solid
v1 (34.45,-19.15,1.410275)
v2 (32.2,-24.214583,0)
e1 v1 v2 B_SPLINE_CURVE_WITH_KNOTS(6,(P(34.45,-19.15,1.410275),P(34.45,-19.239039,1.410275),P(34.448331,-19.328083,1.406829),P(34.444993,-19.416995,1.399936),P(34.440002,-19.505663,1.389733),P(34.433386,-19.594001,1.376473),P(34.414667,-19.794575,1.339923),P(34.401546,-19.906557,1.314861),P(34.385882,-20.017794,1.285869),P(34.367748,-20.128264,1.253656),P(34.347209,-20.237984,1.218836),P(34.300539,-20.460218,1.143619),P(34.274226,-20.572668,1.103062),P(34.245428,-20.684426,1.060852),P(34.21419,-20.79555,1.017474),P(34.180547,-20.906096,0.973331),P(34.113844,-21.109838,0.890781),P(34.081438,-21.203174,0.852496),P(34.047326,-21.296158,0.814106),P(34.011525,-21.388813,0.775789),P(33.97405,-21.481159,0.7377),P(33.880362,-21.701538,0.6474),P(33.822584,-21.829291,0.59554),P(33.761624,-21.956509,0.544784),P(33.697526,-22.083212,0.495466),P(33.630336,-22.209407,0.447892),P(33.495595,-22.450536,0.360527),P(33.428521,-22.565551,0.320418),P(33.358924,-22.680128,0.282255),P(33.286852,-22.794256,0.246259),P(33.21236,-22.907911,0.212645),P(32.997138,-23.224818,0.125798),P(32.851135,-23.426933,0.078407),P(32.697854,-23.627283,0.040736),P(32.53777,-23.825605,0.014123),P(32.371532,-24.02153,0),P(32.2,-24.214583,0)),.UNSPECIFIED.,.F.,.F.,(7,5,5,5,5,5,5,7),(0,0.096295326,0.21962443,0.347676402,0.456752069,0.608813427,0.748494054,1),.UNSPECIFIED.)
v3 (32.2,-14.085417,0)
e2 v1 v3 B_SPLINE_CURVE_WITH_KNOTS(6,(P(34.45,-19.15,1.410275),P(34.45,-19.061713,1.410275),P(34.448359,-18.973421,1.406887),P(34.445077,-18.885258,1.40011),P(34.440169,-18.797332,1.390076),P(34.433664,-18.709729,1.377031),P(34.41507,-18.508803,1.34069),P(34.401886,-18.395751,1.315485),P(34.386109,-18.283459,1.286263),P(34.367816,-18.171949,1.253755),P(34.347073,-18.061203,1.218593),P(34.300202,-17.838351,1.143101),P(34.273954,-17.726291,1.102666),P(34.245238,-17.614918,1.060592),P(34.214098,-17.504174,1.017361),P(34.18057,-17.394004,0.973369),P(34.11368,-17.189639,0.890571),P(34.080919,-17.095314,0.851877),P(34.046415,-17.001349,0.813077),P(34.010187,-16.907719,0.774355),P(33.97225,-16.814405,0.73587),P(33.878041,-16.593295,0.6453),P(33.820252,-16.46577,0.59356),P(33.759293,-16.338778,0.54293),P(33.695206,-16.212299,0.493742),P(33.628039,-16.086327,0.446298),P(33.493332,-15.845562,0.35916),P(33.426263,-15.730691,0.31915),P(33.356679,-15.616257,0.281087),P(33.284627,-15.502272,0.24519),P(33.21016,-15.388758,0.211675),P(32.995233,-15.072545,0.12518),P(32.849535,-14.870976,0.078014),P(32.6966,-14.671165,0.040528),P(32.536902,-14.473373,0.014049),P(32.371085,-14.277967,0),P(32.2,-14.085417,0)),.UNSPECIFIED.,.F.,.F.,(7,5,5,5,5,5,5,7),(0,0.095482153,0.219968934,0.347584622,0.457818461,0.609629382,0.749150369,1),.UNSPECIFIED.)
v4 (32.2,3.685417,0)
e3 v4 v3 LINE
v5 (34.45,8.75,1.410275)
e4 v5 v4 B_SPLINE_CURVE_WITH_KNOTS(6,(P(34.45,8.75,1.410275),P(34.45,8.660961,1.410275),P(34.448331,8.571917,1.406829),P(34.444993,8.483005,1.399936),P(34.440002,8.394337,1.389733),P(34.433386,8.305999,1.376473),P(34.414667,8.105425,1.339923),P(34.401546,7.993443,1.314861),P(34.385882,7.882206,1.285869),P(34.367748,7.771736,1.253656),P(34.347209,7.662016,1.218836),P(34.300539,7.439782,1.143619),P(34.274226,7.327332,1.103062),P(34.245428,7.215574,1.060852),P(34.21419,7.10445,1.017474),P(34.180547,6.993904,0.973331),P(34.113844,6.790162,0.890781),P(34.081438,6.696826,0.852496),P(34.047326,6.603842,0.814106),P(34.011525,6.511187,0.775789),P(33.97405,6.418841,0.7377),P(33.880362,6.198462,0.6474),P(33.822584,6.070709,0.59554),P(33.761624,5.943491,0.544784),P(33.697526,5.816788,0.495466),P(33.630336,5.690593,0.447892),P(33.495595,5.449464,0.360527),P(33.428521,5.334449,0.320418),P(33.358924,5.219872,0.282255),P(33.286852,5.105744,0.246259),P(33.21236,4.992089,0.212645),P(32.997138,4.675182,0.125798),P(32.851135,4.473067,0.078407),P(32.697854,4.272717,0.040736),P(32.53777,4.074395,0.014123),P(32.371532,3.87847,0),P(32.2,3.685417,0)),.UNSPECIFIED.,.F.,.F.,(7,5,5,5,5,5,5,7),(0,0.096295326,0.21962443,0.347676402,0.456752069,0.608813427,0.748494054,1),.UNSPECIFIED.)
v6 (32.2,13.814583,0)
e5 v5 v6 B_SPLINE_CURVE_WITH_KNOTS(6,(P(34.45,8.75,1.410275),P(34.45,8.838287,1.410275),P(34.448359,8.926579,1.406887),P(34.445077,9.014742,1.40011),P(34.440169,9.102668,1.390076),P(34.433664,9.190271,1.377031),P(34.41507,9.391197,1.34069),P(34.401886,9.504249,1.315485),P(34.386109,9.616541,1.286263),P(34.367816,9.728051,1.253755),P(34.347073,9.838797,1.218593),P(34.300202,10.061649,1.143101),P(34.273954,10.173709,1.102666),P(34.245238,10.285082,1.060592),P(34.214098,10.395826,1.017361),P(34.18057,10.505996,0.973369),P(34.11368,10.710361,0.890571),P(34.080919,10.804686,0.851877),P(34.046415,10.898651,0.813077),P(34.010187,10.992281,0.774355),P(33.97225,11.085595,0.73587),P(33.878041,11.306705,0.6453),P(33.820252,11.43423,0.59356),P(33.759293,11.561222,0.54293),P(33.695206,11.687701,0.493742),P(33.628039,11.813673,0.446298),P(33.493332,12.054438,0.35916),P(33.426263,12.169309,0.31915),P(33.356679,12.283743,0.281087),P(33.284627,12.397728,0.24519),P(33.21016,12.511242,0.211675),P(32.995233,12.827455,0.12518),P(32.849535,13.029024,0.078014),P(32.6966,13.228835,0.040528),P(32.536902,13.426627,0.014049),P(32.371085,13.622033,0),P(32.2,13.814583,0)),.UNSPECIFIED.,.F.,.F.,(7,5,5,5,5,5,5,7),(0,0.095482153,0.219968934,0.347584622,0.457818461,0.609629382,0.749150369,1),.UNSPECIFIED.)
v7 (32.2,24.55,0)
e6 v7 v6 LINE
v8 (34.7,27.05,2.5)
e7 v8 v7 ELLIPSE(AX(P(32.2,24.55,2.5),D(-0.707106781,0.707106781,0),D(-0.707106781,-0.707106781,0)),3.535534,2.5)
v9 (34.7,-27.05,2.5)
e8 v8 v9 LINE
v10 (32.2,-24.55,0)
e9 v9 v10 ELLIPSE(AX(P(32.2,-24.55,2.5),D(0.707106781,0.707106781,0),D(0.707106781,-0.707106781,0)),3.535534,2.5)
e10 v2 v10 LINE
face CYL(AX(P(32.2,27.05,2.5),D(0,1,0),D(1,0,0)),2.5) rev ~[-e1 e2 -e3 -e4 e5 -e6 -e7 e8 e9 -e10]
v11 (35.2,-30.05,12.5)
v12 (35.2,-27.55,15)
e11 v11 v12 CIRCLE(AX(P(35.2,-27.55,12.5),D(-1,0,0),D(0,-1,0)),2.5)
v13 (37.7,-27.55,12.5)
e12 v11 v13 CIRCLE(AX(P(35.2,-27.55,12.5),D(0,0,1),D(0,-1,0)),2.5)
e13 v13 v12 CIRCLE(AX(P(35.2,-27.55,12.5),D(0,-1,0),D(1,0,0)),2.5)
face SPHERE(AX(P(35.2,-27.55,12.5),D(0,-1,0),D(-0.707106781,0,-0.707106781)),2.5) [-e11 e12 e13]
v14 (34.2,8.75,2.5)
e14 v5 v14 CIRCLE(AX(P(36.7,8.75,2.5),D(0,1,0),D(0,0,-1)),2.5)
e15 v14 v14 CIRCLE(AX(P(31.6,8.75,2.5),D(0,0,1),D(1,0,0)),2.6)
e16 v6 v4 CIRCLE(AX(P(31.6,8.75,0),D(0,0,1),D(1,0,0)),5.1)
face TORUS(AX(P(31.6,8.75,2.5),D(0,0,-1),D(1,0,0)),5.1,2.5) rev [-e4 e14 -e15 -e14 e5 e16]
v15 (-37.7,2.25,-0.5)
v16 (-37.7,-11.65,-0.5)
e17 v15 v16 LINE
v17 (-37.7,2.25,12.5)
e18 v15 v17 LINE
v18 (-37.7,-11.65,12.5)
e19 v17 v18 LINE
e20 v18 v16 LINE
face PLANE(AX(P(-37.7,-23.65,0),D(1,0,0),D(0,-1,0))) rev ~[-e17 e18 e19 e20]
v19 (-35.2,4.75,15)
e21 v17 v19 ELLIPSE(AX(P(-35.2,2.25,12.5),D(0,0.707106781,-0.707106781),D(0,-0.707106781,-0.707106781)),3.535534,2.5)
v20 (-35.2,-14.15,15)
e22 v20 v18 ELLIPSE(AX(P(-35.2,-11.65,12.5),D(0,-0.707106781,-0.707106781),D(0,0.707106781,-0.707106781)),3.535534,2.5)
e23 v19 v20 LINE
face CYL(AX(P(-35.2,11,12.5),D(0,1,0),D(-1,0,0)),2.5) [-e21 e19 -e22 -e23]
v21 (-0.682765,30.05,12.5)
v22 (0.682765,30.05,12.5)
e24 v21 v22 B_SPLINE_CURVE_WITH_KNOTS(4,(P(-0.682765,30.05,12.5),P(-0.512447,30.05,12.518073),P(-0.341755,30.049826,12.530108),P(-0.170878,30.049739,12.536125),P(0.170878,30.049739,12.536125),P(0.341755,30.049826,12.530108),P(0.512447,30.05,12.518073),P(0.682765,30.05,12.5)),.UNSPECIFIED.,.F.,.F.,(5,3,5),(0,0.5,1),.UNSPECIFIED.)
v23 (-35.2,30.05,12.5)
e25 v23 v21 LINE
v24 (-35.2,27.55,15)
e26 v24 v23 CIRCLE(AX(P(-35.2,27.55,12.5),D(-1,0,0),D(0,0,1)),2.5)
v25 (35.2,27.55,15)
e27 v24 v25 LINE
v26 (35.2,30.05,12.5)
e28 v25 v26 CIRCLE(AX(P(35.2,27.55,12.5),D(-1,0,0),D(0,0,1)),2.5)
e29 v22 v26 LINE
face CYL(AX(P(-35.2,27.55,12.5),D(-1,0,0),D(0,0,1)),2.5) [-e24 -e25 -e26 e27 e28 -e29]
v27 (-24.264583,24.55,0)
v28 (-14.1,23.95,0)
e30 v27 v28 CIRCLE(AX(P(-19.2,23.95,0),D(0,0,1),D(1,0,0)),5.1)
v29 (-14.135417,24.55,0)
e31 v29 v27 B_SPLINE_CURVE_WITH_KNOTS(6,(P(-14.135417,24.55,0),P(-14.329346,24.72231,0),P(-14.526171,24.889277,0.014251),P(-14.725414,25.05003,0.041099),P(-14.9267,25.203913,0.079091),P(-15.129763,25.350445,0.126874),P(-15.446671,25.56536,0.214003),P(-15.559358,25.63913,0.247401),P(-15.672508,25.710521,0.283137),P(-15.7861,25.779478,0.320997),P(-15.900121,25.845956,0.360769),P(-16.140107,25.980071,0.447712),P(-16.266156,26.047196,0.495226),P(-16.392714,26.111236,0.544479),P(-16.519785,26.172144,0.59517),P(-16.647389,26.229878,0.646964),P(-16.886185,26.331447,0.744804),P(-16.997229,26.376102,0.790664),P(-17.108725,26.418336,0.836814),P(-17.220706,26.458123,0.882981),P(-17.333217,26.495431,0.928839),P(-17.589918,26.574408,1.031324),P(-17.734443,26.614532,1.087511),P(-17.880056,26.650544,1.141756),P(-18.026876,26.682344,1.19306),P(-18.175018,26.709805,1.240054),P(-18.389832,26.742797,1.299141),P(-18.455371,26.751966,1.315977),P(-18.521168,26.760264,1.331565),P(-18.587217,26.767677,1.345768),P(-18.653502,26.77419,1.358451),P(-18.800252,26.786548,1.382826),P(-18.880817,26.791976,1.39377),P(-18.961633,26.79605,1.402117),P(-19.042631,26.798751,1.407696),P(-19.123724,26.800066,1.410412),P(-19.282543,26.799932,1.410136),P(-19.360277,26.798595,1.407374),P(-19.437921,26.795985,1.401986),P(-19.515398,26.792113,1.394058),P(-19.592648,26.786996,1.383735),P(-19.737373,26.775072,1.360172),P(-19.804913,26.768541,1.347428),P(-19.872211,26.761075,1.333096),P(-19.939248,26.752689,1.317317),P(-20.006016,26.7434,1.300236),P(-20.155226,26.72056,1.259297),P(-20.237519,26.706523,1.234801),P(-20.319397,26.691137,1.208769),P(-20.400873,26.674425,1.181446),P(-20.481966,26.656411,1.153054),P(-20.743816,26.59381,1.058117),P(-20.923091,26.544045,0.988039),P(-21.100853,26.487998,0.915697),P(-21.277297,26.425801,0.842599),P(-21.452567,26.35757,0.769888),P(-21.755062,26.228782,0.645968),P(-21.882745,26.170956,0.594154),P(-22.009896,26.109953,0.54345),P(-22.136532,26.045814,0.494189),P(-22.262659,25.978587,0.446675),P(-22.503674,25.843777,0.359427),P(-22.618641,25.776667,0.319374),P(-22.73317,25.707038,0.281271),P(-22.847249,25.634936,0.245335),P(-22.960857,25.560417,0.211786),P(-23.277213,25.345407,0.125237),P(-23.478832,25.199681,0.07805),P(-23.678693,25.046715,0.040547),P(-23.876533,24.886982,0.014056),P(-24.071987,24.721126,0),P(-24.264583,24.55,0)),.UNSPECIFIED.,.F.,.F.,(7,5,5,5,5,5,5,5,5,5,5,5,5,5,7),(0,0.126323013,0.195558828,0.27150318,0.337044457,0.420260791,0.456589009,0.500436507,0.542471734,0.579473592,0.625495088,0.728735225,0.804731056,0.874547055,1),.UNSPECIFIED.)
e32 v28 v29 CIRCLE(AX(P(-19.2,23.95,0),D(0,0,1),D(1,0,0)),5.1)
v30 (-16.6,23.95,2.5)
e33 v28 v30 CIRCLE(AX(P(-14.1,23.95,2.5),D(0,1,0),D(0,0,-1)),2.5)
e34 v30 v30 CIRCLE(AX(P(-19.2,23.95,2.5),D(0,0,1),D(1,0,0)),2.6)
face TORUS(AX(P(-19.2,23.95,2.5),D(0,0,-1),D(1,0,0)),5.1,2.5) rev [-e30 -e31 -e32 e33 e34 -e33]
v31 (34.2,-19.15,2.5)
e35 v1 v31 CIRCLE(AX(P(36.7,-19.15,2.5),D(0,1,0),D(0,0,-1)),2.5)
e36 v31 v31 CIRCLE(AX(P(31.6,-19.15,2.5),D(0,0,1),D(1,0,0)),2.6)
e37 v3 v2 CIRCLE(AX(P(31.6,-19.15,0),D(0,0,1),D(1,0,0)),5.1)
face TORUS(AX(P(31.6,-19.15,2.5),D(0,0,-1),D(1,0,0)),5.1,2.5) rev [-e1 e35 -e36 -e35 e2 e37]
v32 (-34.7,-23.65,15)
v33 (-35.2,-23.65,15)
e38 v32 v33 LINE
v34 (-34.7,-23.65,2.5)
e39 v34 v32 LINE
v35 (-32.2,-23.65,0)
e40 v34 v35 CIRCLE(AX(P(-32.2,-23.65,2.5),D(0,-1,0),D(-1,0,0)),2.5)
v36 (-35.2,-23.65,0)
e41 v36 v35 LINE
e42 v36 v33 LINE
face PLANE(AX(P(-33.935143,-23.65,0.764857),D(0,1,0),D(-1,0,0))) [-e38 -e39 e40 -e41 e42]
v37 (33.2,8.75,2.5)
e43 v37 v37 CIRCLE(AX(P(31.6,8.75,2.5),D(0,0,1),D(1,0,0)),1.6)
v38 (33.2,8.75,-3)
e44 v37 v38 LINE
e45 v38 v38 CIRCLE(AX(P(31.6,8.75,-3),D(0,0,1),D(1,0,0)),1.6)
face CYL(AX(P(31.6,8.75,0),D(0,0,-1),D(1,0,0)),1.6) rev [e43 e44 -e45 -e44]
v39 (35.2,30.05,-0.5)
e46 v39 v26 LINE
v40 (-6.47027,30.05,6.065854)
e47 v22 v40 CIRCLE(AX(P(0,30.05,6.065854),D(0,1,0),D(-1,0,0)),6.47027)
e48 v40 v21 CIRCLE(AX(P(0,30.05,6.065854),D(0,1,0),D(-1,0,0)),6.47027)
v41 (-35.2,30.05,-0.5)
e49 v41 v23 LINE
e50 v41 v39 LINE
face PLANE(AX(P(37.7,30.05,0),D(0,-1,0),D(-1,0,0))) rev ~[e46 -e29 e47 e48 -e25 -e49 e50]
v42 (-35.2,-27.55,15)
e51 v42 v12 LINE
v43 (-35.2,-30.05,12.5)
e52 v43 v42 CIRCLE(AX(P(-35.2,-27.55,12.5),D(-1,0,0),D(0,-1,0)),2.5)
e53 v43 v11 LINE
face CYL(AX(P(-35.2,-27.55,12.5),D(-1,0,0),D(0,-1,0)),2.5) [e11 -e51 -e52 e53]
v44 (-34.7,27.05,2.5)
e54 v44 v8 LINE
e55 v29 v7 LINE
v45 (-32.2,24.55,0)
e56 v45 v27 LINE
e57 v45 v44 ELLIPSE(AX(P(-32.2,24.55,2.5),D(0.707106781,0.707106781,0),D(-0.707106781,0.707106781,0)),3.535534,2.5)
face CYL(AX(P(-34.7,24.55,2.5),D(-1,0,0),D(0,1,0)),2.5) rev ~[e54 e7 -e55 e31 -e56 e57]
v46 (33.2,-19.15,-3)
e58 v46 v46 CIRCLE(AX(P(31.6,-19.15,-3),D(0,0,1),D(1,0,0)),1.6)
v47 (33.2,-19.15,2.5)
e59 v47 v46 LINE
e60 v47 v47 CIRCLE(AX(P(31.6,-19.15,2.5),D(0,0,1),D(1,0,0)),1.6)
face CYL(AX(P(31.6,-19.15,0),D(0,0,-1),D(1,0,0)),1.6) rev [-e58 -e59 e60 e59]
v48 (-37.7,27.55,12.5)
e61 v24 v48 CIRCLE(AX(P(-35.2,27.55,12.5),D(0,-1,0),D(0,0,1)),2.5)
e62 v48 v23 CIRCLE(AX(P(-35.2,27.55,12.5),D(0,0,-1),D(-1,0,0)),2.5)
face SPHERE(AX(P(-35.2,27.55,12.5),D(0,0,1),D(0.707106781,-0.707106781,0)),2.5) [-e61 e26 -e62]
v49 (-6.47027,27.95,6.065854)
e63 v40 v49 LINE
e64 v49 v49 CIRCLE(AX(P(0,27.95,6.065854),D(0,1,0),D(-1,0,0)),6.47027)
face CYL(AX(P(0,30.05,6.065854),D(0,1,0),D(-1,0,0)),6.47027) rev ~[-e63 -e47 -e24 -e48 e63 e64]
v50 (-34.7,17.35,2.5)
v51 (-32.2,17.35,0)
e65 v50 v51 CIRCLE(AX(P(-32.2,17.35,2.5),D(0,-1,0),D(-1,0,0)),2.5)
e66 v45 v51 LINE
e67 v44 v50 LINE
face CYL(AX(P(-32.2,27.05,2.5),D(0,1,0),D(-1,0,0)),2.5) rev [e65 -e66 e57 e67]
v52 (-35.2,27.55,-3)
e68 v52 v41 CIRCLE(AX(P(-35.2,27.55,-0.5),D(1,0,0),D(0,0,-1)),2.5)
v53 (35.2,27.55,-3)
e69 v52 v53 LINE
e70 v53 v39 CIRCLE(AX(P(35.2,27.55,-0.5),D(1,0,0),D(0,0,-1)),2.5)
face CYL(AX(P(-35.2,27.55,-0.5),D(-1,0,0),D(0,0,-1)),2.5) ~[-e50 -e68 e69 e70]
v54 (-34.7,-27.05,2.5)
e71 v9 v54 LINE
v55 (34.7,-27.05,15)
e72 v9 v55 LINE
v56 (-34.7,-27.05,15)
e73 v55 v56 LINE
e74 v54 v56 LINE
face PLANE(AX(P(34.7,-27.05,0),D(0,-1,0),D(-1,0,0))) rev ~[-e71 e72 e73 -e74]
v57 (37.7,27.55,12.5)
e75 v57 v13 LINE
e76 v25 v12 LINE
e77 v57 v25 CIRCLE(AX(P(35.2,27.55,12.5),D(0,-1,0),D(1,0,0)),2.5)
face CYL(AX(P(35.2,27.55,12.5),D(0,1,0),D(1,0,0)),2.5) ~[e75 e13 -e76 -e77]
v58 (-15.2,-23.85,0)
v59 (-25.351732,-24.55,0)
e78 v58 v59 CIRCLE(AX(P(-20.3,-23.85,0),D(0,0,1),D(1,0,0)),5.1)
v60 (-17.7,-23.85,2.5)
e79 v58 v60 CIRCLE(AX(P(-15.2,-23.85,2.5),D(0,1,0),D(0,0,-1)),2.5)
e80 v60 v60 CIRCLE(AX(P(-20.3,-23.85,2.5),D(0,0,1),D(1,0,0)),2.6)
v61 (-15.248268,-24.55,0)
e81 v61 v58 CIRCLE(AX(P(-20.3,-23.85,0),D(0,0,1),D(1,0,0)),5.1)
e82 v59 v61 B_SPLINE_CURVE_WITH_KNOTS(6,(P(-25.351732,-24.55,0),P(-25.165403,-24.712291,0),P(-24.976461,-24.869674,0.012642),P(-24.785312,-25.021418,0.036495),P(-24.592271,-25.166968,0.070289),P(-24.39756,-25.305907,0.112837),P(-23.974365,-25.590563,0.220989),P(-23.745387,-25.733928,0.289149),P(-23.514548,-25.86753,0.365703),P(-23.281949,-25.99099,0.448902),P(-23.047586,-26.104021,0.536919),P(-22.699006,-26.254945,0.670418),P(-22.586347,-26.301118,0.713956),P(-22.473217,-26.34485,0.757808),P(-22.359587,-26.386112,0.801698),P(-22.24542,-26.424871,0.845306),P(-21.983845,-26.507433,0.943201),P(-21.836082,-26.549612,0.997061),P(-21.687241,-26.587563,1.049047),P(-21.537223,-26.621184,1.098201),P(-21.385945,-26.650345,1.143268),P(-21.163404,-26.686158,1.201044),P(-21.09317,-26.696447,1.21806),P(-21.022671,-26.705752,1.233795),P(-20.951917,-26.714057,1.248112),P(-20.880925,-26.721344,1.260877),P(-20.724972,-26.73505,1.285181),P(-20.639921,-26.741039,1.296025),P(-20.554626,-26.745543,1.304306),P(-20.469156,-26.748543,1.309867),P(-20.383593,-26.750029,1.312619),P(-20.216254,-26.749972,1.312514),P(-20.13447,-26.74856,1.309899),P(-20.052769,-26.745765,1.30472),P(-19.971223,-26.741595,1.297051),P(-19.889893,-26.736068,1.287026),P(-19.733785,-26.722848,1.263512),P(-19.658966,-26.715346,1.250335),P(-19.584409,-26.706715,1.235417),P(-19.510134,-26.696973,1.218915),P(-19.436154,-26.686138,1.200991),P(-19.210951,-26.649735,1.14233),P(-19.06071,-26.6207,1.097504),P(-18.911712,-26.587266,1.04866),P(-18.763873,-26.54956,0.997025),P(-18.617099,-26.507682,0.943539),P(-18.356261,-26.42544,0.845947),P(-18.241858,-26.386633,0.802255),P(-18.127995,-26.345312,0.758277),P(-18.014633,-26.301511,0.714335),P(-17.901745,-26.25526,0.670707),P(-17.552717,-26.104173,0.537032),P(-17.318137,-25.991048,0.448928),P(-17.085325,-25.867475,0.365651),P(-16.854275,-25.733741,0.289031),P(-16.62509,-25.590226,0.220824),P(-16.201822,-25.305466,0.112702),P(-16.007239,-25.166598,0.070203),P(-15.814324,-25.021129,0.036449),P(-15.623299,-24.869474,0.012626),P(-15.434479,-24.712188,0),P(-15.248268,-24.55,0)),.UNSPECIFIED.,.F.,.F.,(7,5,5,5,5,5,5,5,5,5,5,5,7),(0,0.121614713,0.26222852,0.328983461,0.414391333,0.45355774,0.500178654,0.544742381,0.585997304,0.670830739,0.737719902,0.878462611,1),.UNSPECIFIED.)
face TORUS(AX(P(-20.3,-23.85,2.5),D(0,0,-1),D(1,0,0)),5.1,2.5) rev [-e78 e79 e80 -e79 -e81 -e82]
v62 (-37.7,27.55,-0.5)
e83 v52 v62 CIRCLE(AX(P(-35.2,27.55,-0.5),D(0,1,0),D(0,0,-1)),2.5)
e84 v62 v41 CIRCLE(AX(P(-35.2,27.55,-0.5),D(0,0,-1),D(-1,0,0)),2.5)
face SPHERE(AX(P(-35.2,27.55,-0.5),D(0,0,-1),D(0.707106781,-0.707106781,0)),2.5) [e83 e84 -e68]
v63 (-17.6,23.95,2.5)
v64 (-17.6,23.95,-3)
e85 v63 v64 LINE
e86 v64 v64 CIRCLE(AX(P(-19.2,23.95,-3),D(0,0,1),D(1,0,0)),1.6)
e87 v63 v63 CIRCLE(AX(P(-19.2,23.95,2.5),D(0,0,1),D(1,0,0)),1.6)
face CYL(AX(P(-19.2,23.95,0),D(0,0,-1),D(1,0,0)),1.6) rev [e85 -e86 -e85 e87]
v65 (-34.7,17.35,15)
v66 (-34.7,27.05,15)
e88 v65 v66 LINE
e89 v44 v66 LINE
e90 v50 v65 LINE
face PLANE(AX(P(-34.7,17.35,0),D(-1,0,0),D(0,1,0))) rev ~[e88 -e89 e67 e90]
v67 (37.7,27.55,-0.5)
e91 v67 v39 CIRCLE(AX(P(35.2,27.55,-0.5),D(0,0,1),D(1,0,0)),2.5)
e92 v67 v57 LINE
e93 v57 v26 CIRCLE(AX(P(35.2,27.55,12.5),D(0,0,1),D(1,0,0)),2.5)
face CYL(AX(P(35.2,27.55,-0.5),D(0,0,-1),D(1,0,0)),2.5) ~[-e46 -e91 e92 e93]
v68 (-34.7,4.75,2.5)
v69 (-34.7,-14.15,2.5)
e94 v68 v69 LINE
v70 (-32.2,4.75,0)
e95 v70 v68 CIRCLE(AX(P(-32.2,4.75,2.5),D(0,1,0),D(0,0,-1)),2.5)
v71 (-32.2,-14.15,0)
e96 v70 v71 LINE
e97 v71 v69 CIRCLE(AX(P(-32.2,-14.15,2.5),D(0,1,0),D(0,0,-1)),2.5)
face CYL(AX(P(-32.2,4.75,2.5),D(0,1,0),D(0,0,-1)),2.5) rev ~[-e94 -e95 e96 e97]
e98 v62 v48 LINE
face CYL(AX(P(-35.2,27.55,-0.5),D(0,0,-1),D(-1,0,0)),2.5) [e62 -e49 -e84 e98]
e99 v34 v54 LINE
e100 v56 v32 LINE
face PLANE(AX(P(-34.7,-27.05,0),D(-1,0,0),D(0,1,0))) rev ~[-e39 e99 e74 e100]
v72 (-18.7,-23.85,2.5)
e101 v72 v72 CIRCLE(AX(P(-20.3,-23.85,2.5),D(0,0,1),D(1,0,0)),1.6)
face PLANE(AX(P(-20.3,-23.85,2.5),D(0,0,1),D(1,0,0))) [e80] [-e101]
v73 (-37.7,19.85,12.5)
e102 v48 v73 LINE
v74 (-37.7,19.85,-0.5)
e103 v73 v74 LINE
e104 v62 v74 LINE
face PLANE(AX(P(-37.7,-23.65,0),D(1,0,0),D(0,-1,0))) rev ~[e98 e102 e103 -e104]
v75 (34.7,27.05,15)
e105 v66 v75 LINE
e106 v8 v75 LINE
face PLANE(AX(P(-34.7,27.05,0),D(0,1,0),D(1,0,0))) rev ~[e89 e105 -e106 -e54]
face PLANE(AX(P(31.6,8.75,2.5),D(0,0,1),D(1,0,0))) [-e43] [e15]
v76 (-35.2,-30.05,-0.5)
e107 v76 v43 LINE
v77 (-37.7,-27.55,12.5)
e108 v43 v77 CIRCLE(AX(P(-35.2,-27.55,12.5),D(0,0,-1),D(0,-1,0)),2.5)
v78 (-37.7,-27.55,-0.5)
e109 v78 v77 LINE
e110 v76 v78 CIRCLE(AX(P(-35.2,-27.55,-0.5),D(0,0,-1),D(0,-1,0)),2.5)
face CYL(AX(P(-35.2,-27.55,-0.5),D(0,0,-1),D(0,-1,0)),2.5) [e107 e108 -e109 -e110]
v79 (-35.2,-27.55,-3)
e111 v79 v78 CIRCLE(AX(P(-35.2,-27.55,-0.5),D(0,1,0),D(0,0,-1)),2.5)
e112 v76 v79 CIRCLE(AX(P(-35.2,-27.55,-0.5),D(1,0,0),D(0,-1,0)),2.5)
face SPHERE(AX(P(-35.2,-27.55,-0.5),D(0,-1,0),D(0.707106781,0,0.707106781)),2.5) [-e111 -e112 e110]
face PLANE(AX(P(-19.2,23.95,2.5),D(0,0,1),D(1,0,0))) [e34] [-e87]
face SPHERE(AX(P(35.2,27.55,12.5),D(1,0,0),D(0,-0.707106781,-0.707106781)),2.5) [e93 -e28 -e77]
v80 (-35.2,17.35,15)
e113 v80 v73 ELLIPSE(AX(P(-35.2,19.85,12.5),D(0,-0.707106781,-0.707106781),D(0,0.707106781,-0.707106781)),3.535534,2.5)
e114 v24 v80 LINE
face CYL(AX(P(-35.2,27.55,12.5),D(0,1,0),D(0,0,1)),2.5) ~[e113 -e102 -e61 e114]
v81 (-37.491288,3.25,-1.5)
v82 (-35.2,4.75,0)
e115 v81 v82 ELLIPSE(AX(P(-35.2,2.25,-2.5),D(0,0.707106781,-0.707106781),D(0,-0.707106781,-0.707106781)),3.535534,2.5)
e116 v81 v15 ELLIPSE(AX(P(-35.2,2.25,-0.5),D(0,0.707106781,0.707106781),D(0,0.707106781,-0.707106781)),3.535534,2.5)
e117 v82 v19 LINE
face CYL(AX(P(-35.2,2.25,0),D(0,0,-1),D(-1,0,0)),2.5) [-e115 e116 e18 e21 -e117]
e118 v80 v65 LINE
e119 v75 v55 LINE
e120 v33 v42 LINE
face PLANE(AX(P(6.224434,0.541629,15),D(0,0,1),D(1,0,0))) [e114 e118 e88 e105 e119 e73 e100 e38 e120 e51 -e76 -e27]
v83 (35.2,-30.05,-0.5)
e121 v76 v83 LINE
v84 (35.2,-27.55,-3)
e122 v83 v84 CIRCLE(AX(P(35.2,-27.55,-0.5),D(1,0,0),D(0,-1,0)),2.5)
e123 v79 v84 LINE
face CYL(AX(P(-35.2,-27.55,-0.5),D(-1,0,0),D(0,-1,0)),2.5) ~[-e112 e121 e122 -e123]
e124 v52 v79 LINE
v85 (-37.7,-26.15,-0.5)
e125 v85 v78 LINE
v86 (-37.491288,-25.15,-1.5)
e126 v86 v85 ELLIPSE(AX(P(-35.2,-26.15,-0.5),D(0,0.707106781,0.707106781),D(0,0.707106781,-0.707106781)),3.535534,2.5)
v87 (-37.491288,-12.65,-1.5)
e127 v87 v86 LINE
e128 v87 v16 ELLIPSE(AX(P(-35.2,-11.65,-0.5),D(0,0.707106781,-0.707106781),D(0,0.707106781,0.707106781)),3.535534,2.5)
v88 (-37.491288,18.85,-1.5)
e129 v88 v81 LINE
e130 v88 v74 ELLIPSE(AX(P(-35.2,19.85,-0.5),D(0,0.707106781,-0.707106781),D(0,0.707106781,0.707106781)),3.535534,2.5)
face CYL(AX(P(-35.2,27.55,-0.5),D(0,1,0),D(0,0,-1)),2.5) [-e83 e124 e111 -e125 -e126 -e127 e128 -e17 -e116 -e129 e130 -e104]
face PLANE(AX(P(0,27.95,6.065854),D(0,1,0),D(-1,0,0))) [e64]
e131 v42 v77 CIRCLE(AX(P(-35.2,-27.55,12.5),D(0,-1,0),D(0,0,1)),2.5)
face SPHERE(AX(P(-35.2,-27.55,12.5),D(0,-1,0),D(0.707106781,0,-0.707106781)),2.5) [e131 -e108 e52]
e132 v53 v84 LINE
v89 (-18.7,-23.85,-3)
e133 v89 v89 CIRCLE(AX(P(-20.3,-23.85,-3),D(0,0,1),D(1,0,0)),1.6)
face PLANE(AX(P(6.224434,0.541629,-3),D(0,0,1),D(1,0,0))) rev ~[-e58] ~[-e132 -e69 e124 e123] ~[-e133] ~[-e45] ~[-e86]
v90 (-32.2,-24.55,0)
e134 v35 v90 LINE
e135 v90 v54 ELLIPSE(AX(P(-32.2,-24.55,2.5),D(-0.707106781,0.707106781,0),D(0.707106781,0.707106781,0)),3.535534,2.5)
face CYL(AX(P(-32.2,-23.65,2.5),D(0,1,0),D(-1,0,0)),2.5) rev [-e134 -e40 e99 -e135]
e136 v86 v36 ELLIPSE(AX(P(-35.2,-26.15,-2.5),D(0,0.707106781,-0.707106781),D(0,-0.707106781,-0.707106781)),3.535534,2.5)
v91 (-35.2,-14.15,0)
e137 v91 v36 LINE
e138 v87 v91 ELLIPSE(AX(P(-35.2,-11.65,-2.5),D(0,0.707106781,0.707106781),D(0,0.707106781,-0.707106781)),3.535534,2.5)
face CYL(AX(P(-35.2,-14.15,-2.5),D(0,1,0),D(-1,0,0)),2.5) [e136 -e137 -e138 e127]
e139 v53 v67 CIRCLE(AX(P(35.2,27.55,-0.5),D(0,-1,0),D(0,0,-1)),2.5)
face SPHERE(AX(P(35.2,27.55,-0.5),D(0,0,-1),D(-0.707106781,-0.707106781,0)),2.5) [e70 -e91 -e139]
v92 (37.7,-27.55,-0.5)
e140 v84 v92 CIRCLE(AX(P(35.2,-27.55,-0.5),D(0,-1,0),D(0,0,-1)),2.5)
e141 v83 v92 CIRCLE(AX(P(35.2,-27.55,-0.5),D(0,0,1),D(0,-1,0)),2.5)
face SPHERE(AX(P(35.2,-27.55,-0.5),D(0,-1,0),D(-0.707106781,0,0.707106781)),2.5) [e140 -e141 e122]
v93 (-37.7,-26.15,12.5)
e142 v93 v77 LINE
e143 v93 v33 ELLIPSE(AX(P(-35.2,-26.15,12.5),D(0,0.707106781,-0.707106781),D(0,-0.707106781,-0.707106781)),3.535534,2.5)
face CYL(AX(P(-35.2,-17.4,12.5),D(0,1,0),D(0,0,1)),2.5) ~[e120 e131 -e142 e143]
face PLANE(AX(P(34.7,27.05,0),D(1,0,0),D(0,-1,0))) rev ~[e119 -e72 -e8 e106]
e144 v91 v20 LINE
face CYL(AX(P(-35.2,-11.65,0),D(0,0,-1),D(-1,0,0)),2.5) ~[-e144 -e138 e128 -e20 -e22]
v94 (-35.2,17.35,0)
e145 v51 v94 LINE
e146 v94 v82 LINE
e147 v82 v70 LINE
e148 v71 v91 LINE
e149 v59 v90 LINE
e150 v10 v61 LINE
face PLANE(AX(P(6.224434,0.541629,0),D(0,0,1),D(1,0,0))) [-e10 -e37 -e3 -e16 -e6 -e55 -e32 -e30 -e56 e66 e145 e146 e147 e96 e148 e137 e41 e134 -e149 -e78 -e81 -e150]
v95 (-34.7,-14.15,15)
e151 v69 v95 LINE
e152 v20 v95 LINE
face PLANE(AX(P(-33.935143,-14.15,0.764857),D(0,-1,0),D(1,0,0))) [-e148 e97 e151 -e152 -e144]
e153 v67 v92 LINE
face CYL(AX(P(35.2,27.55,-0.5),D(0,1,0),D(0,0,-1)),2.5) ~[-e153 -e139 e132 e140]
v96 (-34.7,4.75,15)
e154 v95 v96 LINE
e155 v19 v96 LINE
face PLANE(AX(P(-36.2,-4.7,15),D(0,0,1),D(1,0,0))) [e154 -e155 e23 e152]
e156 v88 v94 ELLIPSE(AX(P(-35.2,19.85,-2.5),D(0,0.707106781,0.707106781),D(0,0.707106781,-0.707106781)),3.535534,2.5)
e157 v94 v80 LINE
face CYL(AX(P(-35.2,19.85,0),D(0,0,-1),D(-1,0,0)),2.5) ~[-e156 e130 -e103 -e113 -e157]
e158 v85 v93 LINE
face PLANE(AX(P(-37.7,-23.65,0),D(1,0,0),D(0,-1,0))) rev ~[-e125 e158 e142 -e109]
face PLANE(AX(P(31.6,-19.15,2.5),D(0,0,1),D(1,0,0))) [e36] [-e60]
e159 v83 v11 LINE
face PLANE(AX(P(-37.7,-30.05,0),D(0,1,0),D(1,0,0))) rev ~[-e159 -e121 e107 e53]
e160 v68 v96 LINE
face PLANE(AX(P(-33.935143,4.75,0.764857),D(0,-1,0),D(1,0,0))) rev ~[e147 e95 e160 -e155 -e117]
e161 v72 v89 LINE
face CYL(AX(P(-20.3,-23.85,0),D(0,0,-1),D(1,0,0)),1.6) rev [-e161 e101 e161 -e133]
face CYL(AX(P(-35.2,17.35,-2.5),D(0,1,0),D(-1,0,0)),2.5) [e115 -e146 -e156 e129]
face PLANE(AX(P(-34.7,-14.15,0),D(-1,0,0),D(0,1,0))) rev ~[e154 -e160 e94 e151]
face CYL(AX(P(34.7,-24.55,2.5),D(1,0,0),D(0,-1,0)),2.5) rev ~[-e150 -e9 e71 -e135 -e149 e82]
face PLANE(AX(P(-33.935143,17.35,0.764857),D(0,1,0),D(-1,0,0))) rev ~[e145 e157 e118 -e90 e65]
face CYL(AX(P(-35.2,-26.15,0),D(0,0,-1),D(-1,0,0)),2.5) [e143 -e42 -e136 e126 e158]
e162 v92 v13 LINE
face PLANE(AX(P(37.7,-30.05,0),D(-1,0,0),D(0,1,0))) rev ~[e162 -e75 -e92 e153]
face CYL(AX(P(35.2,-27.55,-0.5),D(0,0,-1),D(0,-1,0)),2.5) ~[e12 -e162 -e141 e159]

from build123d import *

# Parameters (mm, degrees)
F0_W          = 0.4
F0_H          = 0.3
F0_H_2        = 8.9
F0_W_2        = 9.5
F0_R          = 2.6
F0_W_3        = 10.3
F0_H_3        = 12
F0_W_4        = 3
F0_R_2        = 1.6
F0_H_4        = 18.9
F1_DEPTH      = 3
F2_DEPTH      = 15
F3_DEPTH      = 2.5
F4_T1_DEPTH   = 9.7
F4_T3_DEPTH   = 18.9
F4_T5_DEPTH   = 3.4
F4_T10_DEPTH  = 69.4
F4_S11_R      = 2.6
F4_T12_DEPTH  = 36
F4_T16_DEPTH  = 69.4
F4_S17_R      = 2.6
F4_T18_DEPTH  = 36
F4_T22_DEPTH  = 54.1
F4_S23_R      = 2.6
F4_T24_DEPTH  = 29
F4_S25_R      = 2.6
F4_T26_DEPTH  = 29
F4_T35_DEPTH  = 13
F4_T37_DEPTH  = 21.25
F4_T39_DEPTH  = 12.6
F4_T41_DEPTH  = 9.5
F4_T43_DEPTH  = 55.1
F4_T45_DEPTH  = 70.4
F4_T47_DEPTH  = 31.4
F4_T49_DEPTH  = 16.45
F4_T51_DEPTH  = 10.15
F4_S55_W      = 2.55
F4_S55_H      = 2.55
F4_T56_DEPTH  = 2.55
F4_S61_W      = 2.55
F4_S61_H      = 2.55
F4_T62_DEPTH  = 2.55
F4_S67_W      = 2.55
F4_S67_H      = 2.55
F4_T68_DEPTH  = 2.55
F4_S73_W      = 2.55
F4_S73_H      = 2.55
F4_T74_DEPTH  = 2.55
F4_S79_W      = 2.55
F4_S79_H      = 2.55
F4_T80_DEPTH  = 2.55
F4_S85_W      = 2.55
F4_S85_H      = 2.55
F4_T86_DEPTH  = 2.55
F4_S91_W      = 2.55
F4_S91_H      = 2.55
F4_T92_DEPTH  = 2.55
F4_S97_W      = 2.55
F4_S97_H      = 2.55
F4_T98_DEPTH  = 2.55
F4_T105_DEPTH = 15.75
F4_T109_DEPTH = 21.25
F4_T117_DEPTH = 18.85
F4_T121_DEPTH = 21.25
F4_T129_DEPTH = 21.25
F4_T134_DEPTH = 18.85
F4_T141_DEPTH = 21.25
F4_T146_DEPTH = 15.75
F5_R          = 6.4702703145
F6_DEPTH      = 2.1


# Not quite as in the source:
# - a fillet or chamfer that OpenCascade refuses, or shapes differently, is made with other operations: its cross-section is extruded or revolved along the edge and cut away or added


with BuildPart() as f1:
    # F0 (on Top) → F1 (new body)
    with BuildSketch(Plane.XY):
        Polygon((-34.7, -27.05), (-34.7, -23.65), (-37.7, -23.65), (-37.7, -30.05), (37.7, -30.05), (37.7, 30.05), (-37.7, 30.05), (-37.7, 17.35), (-34.7, 17.35), (-34.7, 27.05), (34.7, 27.05), (34.7, -27.05), align=None)
        with Locations((-34.5, -14.3)):
            Rectangle(F0_W, F0_H)
        with Locations((-34.5, -18.9)):
            Rectangle(F0_W, F0_H_2)
        with Locations((-29.55, -18.9)):
            Rectangle(F0_W_2, F0_H_2)
        Polygon((-34.3, -26.65), (34.3, -26.65), (34.3, 26.65), (-34.3, 26.65), (-34.3, 17.35), (-23.7, 17.35), (-23.7, 4.75), (-34.3, 4.75), (-34.3, -14.15), (-24.5, -14.15), (-24.5, -23.65), (-34.3, -23.65), align=None)
        with Locations((-20.3, -23.85)):
            Circle(F0_R, mode=Mode.SUBTRACT)
        with Locations((31.6, -19.15)):
            Circle(F0_R, mode=Mode.SUBTRACT)
        with Locations((-19.2, 23.95)):
            Circle(F0_R, mode=Mode.SUBTRACT)
        with Locations((31.6, 8.75)):
            Circle(F0_R, mode=Mode.SUBTRACT)
        Polygon((34.3, 26.65), (34.3, -26.65), (-34.3, -26.65), (-34.3, -23.65), (-34.7, -23.65), (-34.7, -27.05), (34.7, -27.05), (34.7, 27.05), (-34.7, 27.05), (-34.7, 17.35), (-34.3, 17.35), (-34.3, 26.65), align=None)
        with Locations((-29.15, 11.05)):
            Rectangle(F0_W_3, F0_H_3)
        with Locations((-36.2, 11.05)):
            Rectangle(F0_W_4, F0_H_3)
        with Locations((-34.5, 11.05)):
            Rectangle(F0_W, F0_H_3)
        with Locations((-36.2, -18.9)):
            Rectangle(F0_W_4, F0_H_2)
        with Locations((-36.2, -14.3)):
            Rectangle(F0_W_4, F0_H)
        with Locations((-19.2, 23.95)):
            Circle(F0_R)
        with Locations((-19.2, 23.95)):
            Circle(F0_R_2, mode=Mode.SUBTRACT)
        with Locations((-20.3, -23.85)):
            Circle(F0_R)
        with Locations((-20.3, -23.85)):
            Circle(F0_R_2, mode=Mode.SUBTRACT)
        with Locations((31.6, -19.15)):
            Circle(F0_R)
        with Locations((31.6, -19.15)):
            Circle(F0_R_2, mode=Mode.SUBTRACT)
        with Locations((31.6, 8.75)):
            Circle(F0_R)
        with Locations((31.6, 8.75)):
            Circle(F0_R_2, mode=Mode.SUBTRACT)
        with Locations((-36.2, 4.9)):
            Rectangle(F0_W_4, F0_H)
        with Locations((-34.5, 4.9)):
            Rectangle(F0_W, F0_H)
        Polygon((-23.7, 17.35), (-34.3, 17.35), (-34.3, 17.05), (-24, 17.05), (-24, 5.05), (-34.3, 5.05), (-34.3, 4.75), (-23.7, 4.75), align=None)
        with Locations((-34.5, -4.7)):
            Rectangle(F0_W, F0_H_4)
        with Locations((-36.2, -4.7)):
            Rectangle(F0_W_4, F0_H_4)
        Polygon((-34.3, -23.35), (-34.3, -23.65), (-24.5, -23.65), (-24.5, -14.15), (-34.3, -14.15), (-34.3, -14.45), (-24.8, -14.45), (-24.8, -23.35), align=None)
        with Locations((-36.2, 17.2)):
            Rectangle(F0_W_4, F0_H)
        with Locations((-34.5, 17.2)):
            Rectangle(F0_W, F0_H)
        with Locations((-34.5, -23.5)):
            Rectangle(F0_W, F0_H)
        with Locations((-36.2, -23.5)):
            Rectangle(F0_W_4, F0_H)
    extrude(amount=-F1_DEPTH)

    # F0 (on Top) → F2 (join)
    with BuildSketch(Plane.XY):
        Polygon((-34.7, -27.05), (-34.7, -23.65), (-37.7, -23.65), (-37.7, -30.05), (37.7, -30.05), (37.7, 30.05), (-37.7, 30.05), (-37.7, 17.35), (-34.7, 17.35), (-34.7, 27.05), (34.7, 27.05), (34.7, -27.05), align=None)
        with Locations((-36.2, -4.7)):
            Rectangle(F0_W_4, F0_H_4)
    extrude(amount=F2_DEPTH)

    # F0 (on Top) → F3 (join)
    with BuildSketch(Plane.XY):
        with Locations((-20.3, -23.85)):
            Circle(F0_R)
        with Locations((-20.3, -23.85)):
            Circle(F0_R_2, mode=Mode.SUBTRACT)
        with Locations((-19.2, 23.95)):
            Circle(F0_R)
        with Locations((-19.2, 23.95)):
            Circle(F0_R_2, mode=Mode.SUBTRACT)
        with Locations((31.6, 8.75)):
            Circle(F0_R)
        with Locations((31.6, 8.75)):
            Circle(F0_R_2, mode=Mode.SUBTRACT)
        with Locations((31.6, -19.15)):
            Circle(F0_R)
        with Locations((31.6, -19.15)):
            Circle(F0_R_2, mode=Mode.SUBTRACT)
    extrude(amount=F3_DEPTH)

    # F4: fillet of radius 2.5 on 30 edges, made by hand

    # F4_s2 → F4_t1 (join)
    with BuildSketch(Plane.XZ.offset(-27.05)):
        with BuildLine():
            ThreePointArc((-34.7, 2.5), (-33.967766953, 0.732233047), (-32.2, 0))
            Line((-32.2, 0), (-34.7, 0))
            Line((-34.7, 0), (-34.7, 2.5))
        make_face()
    extrude(amount=F4_T1_DEPTH)

    # F4_s4 → F4_t3 (join)
    with BuildSketch(Plane.XZ.offset(-4.75)):
        with BuildLine():
            ThreePointArc((-32.2, 0), (-33.967766953, 0.732233047), (-34.7, 2.5))
            Line((-34.7, 2.5), (-34.7, 0))
            Line((-34.7, 0), (-32.2, 0))
        make_face()
    extrude(amount=F4_T3_DEPTH)

    # F4_s6 → F4_t5 (join)
    with BuildSketch(Plane.XZ.offset(23.65)):
        with BuildLine():
            ThreePointArc((-34.7, 2.5), (-33.967766953, 0.732233047), (-32.2, 0))
            Line((-32.2, 0), (-34.7, 0))
            Line((-34.7, 0), (-34.7, 2.5))
        make_face()
    extrude(amount=F4_T5_DEPTH)


with BuildPart() as f4_tool8:
    # F4_s9 → F4_t10 (new body)
    with BuildSketch(Plane.YZ.offset(-34.7)):
        with BuildLine():
            ThreePointArc((27.05, 2.5), (26.317766953, 0.732233047), (24.55, 0))
            Line((24.55, 0), (27.05, 0))
            Line((27.05, 0), (27.05, 2.5))
        make_face()
    extrude(amount=F4_T10_DEPTH)

    # F4_s11 → F4_t12 (cut, symmetric)
    with BuildSketch(Plane.XY.offset(1.2)):
        with Locations((-19.2, 23.95)):
            Circle(F4_S11_R)
    extrude(amount=F4_T12_DEPTH, both=True, mode=Mode.SUBTRACT)


with BuildPart() as f1_1:
    add(f1.part)

    # F4_t7: union F4_tool8
    add(f4_tool8.part)


with BuildPart() as f4_tool14:
    # F4_s15 → F4_t16 (new body)
    with BuildSketch(Plane.YZ.offset(34.7)):
        with BuildLine():
            ThreePointArc((-27.05, 2.5), (-26.317766953, 0.732233047), (-24.55, 0))
            Line((-24.55, 0), (-27.05, 0))
            Line((-27.05, 0), (-27.05, 2.5))
        make_face()
    extrude(amount=-F4_T16_DEPTH)

    # F4_s17 → F4_t18 (cut, symmetric)
    with BuildSketch(Plane.XY.offset(1.2)):
        with Locations((-20.3, -23.85)):
            Circle(F4_S17_R)
    extrude(amount=F4_T18_DEPTH, both=True, mode=Mode.SUBTRACT)


with BuildPart() as f1_2:
    add(f1_1.part)

    # F4_t13: union F4_tool14
    add(f4_tool14.part)


with BuildPart() as f4_tool20:
    # F4_s21 → F4_t22 (new body)
    with BuildSketch(Plane.XZ.offset(-27.05)):
        with BuildLine():
            ThreePointArc((34.7, 2.5), (33.967766953, 0.732233047), (32.2, 0))
            Line((32.2, 0), (34.7, 0))
            Line((34.7, 0), (34.7, 2.5))
        make_face()
    extrude(amount=F4_T22_DEPTH)

    # F4_s23 → F4_t24 (cut, symmetric)
    with BuildSketch(Plane.XY.offset(1.2)):
        with Locations((31.6, -19.15)):
            Circle(F4_S23_R)
    extrude(amount=F4_T24_DEPTH, both=True, mode=Mode.SUBTRACT)

    # F4_s25 → F4_t26 (cut, symmetric)
    with BuildSketch(Plane.XY.offset(1.2)):
        with Locations((31.6, 8.75)):
            Circle(F4_S25_R)
    extrude(amount=F4_T26_DEPTH, both=True, mode=Mode.SUBTRACT)


with BuildPart() as f1_3:
    add(f1_2.part)

    # F4_t19: union F4_tool20
    add(f4_tool20.part)

    # F4_s27 → F4_t28 (revolve)
    with BuildSketch(Plane.XZ.offset(-8.75)):
        with BuildLine():
            ThreePointArc((36.7, 0), (34.932233047, 0.732233047), (34.2, 2.5))
            Line((34.2, 2.5), (34.2, 0))
            Line((34.2, 0), (36.7, 0))
        make_face()
    revolve(axis=Axis((31.6, 8.75, 0), (0, 0, 1)))

    # F4_s29 → F4_t30 (revolve)
    with BuildSketch(Plane.XZ.offset(19.15)):
        with BuildLine():
            ThreePointArc((36.7, 0), (34.932233047, 0.732233047), (34.2, 2.5))
            Line((34.2, 2.5), (34.2, 0))
            Line((34.2, 0), (36.7, 0))
        make_face()
    revolve(axis=Axis((31.6, -19.15, 0), (0, 0, 1)))

    # F4_s31 → F4_t32 (revolve)
    with BuildSketch(Plane.XZ.offset(23.85)):
        with BuildLine():
            ThreePointArc((-15.2, 0), (-16.967766953, 0.732233047), (-17.7, 2.5))
            Line((-17.7, 2.5), (-17.7, 0))
            Line((-17.7, 0), (-15.2, 0))
        make_face()
    revolve(axis=Axis((-20.3, -23.85, 0), (0, 0, 1)))

    # F4_s33 → F4_t34 (revolve)
    with BuildSketch(Plane.XZ.offset(-23.95)):
        with BuildLine():
            ThreePointArc((-14.1, 0), (-15.867766953, 0.732233047), (-16.6, 2.5))
            Line((-16.6, 2.5), (-16.6, 0))
            Line((-16.6, 0), (-14.1, 0))
        make_face()
    revolve(axis=Axis((-19.2, 23.95, 0), (0, 0, 1)))

    # F4_s36 → F4_t35 (cut)
    with BuildSketch(Plane.XY.offset(-0.5)):
        with BuildLine():
            ThreePointArc((35.2, -30.05), (36.967766953, -29.317766953), (37.7, -27.55))
            Line((37.7, -27.55), (37.7, -30.05))
            Line((37.7, -30.05), (35.2, -30.05))
        make_face()
        with BuildLine():
            ThreePointArc((37.7, 27.55), (36.967766953, 29.317766953), (35.2, 30.05))
            Line((35.2, 30.05), (37.7, 30.05))
            Line((37.7, 30.05), (37.7, 27.55))
        make_face()
        with BuildLine():
            ThreePointArc((-37.7, 27.55), (-36.967766953, 29.317766953), (-35.2, 30.05))
            Line((-35.2, 30.05), (-37.7, 30.05))
            Line((-37.7, 30.05), (-37.7, 27.55))
        make_face()
        with BuildLine():
            ThreePointArc((-35.2, -30.05), (-36.967766953, -29.317766953), (-37.7, -27.55))
            Line((-37.7, -27.55), (-37.7, -30.05))
            Line((-37.7, -30.05), (-35.2, -30.05))
        make_face()
    extrude(amount=F4_T35_DEPTH, mode=Mode.SUBTRACT)

    # F4_s38 → F4_t37 (cut)
    with BuildSketch(Plane.XY):
        with BuildLine():
            ThreePointArc((-37.7, -11.65), (-36.967766953, -13.417766953), (-35.2, -14.15))
            Line((-35.2, -14.15), (-37.7, -14.15))
            Line((-37.7, -14.15), (-37.7, -11.65))
        make_face()
        with BuildLine():
            ThreePointArc((-37.7, 19.85), (-36.967766953, 18.082233047), (-35.2, 17.35))
            Line((-35.2, 17.35), (-37.7, 17.35))
            Line((-37.7, 17.35), (-37.7, 19.85))
        make_face()
        with BuildLine():
            ThreePointArc((-37.7, 2.25), (-36.967766953, 4.017766953), (-35.2, 4.75))
            Line((-35.2, 4.75), (-37.7, 4.75))
            Line((-37.7, 4.75), (-37.7, 2.25))
        make_face()
        with BuildLine():
            ThreePointArc((-37.7, -26.15), (-36.967766953, -24.382233047), (-35.2, -23.65))
            Line((-35.2, -23.65), (-37.7, -23.65))
            Line((-37.7, -23.65), (-37.7, -26.15))
        make_face()
    extrude(amount=F4_T37_DEPTH, mode=Mode.SUBTRACT)

    # F4_s40 → F4_t39 (cut)
    with BuildSketch(Plane.XZ.offset(-17.35)):
        with BuildLine():
            ThreePointArc((-37.7, -2.5), (-36.967766953, -0.732233047), (-35.2, 0))
            Line((-35.2, 0), (-37.7, 0))
            Line((-37.7, 0), (-37.7, -2.5))
        make_face()
    extrude(amount=F4_T39_DEPTH, mode=Mode.SUBTRACT)

    # F4_s42 → F4_t41 (cut)
    with BuildSketch(Plane.XZ.offset(14.15)):
        with BuildLine():
            ThreePointArc((-37.7, -2.5), (-36.967766953, -0.732233047), (-35.2, 0))
            Line((-35.2, 0), (-37.7, 0))
            Line((-37.7, 0), (-37.7, -2.5))
        make_face()
    extrude(amount=F4_T41_DEPTH, mode=Mode.SUBTRACT)

    # F4_s44 → F4_t43 (cut)
    with BuildSketch(Plane.XZ.offset(-27.55)):
        with BuildLine():
            ThreePointArc((35.2, -3), (36.967766953, -2.267766953), (37.7, -0.5))
            Line((37.7, -0.5), (37.7, -3))
            Line((37.7, -3), (35.2, -3))
        make_face()
        with BuildLine():
            ThreePointArc((-35.2, -3), (-36.967766953, -2.267766953), (-37.7, -0.5))
            Line((-37.7, -0.5), (-37.7, -3))
            Line((-37.7, -3), (-35.2, -3))
        make_face()
        with BuildLine():
            ThreePointArc((37.7, 12.5), (36.967766953, 14.267766953), (35.2, 15))
            Line((35.2, 15), (37.7, 15))
            Line((37.7, 15), (37.7, 12.5))
        make_face()
    extrude(amount=F4_T43_DEPTH, mode=Mode.SUBTRACT)

    # F4_s46 → F4_t45 (cut)
    with BuildSketch(Plane.YZ.offset(-35.2)):
        with BuildLine():
            ThreePointArc((27.55, -3), (29.317766953, -2.267766953), (30.05, -0.5))
            Line((30.05, -0.5), (30.05, -3))
            Line((30.05, -3), (27.55, -3))
        make_face()
        with BuildLine():
            ThreePointArc((-30.05, -0.5), (-29.317766953, -2.267766953), (-27.55, -3))
            Line((-27.55, -3), (-30.05, -3))
            Line((-30.05, -3), (-30.05, -0.5))
        make_face()
        with BuildLine():
            ThreePointArc((27.55, 15), (29.317766953, 14.267766953), (30.05, 12.5))
            Line((30.05, 12.5), (30.05, 15))
            Line((30.05, 15), (27.55, 15))
        make_face()
        with BuildLine():
            ThreePointArc((-30.05, 12.5), (-29.317766953, 14.267766953), (-27.55, 15))
            Line((-27.55, 15), (-30.05, 15))
            Line((-30.05, 15), (-30.05, 12.5))
        make_face()
    extrude(amount=F4_T45_DEPTH, mode=Mode.SUBTRACT)

    # F4_s48 → F4_t47 (cut)
    with BuildSketch(Plane.XZ.offset(-11)):
        with BuildLine():
            ThreePointArc((-37.7, 12.5), (-36.967766953, 14.267766953), (-35.2, 15))
            Line((-35.2, 15), (-37.7, 15))
            Line((-37.7, 15), (-37.7, 12.5))
        make_face()
    extrude(amount=F4_T47_DEPTH, mode=Mode.SUBTRACT)

    # F4_s50 → F4_t49 (cut)
    with BuildSketch(Plane.XZ.offset(-27.55)):
        with BuildLine():
            ThreePointArc((-35.2, 15), (-36.967766953, 14.267766953), (-37.7, 12.5))
            Line((-37.7, 12.5), (-37.7, 15))
            Line((-37.7, 15), (-35.2, 15))
        make_face()
    extrude(amount=F4_T49_DEPTH, mode=Mode.SUBTRACT)

    # F4_s52 → F4_t51 (cut)
    with BuildSketch(Plane.XZ.offset(17.4)):
        with BuildLine():
            ThreePointArc((-35.2, 15), (-36.967766953, 14.267766953), (-37.7, 12.5))
            Line((-37.7, 12.5), (-37.7, 15))
            Line((-37.7, 15), (-35.2, 15))
        make_face()
    extrude(amount=F4_T51_DEPTH, mode=Mode.SUBTRACT)


with BuildPart() as f4_tool54:
    # F4_s55 → F4_t56 (new body)
    with BuildSketch(Plane.XZ.offset(27.55)):
        with Locations((36.475, -1.775)):
            Rectangle(F4_S55_W, F4_S55_H)
    extrude(amount=F4_T56_DEPTH)

    # F4_s57 → F4_t58 (revolve, cut)
    with BuildSketch(Plane(origin=(35.2, -27.55, -0.5), x_dir=(-0.7071067812, 0, 0.7071067812), z_dir=(0.7071067812, 0, 0.7071067812))):
        with BuildLine():
            ThreePointArc((0, -2.5), (2.5, 0), (0, 2.5))
            Line((0, 2.5), (0, -2.5))
        make_face()
    revolve(axis=Axis((35.2, -27.55, -0.5), (0, -1, 0)), mode=Mode.SUBTRACT)


with BuildPart() as f1_4:
    add(f1_3.part)

    # F4_t53: cut F4_tool54
    add(f4_tool54.part, mode=Mode.SUBTRACT)


with BuildPart() as f4_tool60:
    # F4_s61 → F4_t62 (new body)
    with BuildSketch(Plane.XZ.offset(27.55)):
        with Locations((36.475, 13.775)):
            Rectangle(F4_S61_W, F4_S61_H)
    extrude(amount=F4_T62_DEPTH)

    # F4_s63 → F4_t64 (revolve, cut)
    with BuildSketch(Plane(origin=(35.2, -27.55, 12.5), x_dir=(-0.7071067812, 0, -0.7071067812), z_dir=(-0.7071067812, 0, 0.7071067812))):
        with BuildLine():
            ThreePointArc((0, -2.5), (2.5, 0), (0, 2.5))
            Line((0, 2.5), (0, -2.5))
        make_face()
    revolve(axis=Axis((35.2, -27.55, 12.5), (0, -1, 0)), mode=Mode.SUBTRACT)


with BuildPart() as f1_5:
    add(f1_4.part)

    # F4_t59: cut F4_tool60
    add(f4_tool60.part, mode=Mode.SUBTRACT)


with BuildPart() as f4_tool66:
    # F4_s67 → F4_t68 (new body)
    with BuildSketch(Plane.XY.offset(-0.5)):
        with Locations((36.475, 28.825)):
            Rectangle(F4_S67_W, F4_S67_H)
    extrude(amount=-F4_T68_DEPTH)

    # F4_s69 → F4_t70 (revolve, cut)
    with BuildSketch(Plane(origin=(35.2, 27.55, -0.5), x_dir=(-0.7071067812, -0.7071067812, 0), z_dir=(0.7071067812, -0.7071067812, 0))):
        with BuildLine():
            ThreePointArc((0, -2.5), (2.5, 0), (0, 2.5))
            Line((0, 2.5), (0, -2.5))
        make_face()
    revolve(axis=Axis((35.2, 27.55, -0.5), (0, 0, -1)), mode=Mode.SUBTRACT)


with BuildPart() as f1_6:
    add(f1_5.part)

    # F4_t65: cut F4_tool66
    add(f4_tool66.part, mode=Mode.SUBTRACT)


with BuildPart() as f4_tool72:
    # F4_s73 → F4_t74 (new body)
    with BuildSketch(Plane.YZ.offset(35.2)):
        with Locations((28.825, 13.775)):
            Rectangle(F4_S73_W, F4_S73_H)
    extrude(amount=F4_T74_DEPTH)

    # F4_s75 → F4_t76 (revolve, cut)
    with BuildSketch(Plane(origin=(35.2, 27.55, 12.5), x_dir=(0, -0.7071067812, -0.7071067812), z_dir=(0, -0.7071067812, 0.7071067812))):
        with BuildLine():
            ThreePointArc((0, -2.5), (2.5, 0), (0, 2.5))
            Line((0, 2.5), (0, -2.5))
        make_face()
    revolve(axis=Axis((35.2, 27.55, 12.5), (1, 0, 0)), mode=Mode.SUBTRACT)


with BuildPart() as f1_7:
    add(f1_6.part)

    # F4_t71: cut F4_tool72
    add(f4_tool72.part, mode=Mode.SUBTRACT)


with BuildPart() as f4_tool78:
    # F4_s79 → F4_t80 (new body)
    with BuildSketch(Plane.XY.offset(12.5)):
        with Locations((-36.475, 28.825)):
            Rectangle(F4_S79_W, F4_S79_H)
    extrude(amount=F4_T80_DEPTH)

    # F4_s81 → F4_t82 (revolve, cut)
    with BuildSketch(Plane(origin=(-35.2, 27.55, 12.5), x_dir=(0.7071067812, -0.7071067812, 0), z_dir=(-0.7071067812, -0.7071067812, 0))):
        with BuildLine():
            ThreePointArc((0, -2.5), (2.5, 0), (0, 2.5))
            Line((0, 2.5), (0, -2.5))
        make_face()
    revolve(axis=Axis((-35.2, 27.55, 12.5), (0, 0, 1)), mode=Mode.SUBTRACT)


with BuildPart() as f1_8:
    add(f1_7.part)

    # F4_t77: cut F4_tool78
    add(f4_tool78.part, mode=Mode.SUBTRACT)


with BuildPart() as f4_tool84:
    # F4_s85 → F4_t86 (new body)
    with BuildSketch(Plane.XY.offset(-0.5)):
        with Locations((-36.475, 28.825)):
            Rectangle(F4_S85_W, F4_S85_H)
    extrude(amount=-F4_T86_DEPTH)

    # F4_s87 → F4_t88 (revolve, cut)
    with BuildSketch(Plane(origin=(-35.2, 27.55, -0.5), x_dir=(0.7071067812, -0.7071067812, 0), z_dir=(0.7071067812, 0.7071067812, 0))):
        with BuildLine():
            ThreePointArc((0, -2.5), (2.5, 0), (0, 2.5))
            Line((0, 2.5), (0, -2.5))
        make_face()
    revolve(axis=Axis((-35.2, 27.55, -0.5), (0, 0, -1)), mode=Mode.SUBTRACT)


with BuildPart() as f1_9:
    add(f1_8.part)

    # F4_t83: cut F4_tool84
    add(f4_tool84.part, mode=Mode.SUBTRACT)


with BuildPart() as f4_tool90:
    # F4_s91 → F4_t92 (new body)
    with BuildSketch(Plane.XZ.offset(27.55)):
        with Locations((-36.475, 13.775)):
            Rectangle(F4_S91_W, F4_S91_H)
    extrude(amount=F4_T92_DEPTH)

    # F4_s93 → F4_t94 (revolve, cut)
    with BuildSketch(Plane(origin=(-35.2, -27.55, 12.5), x_dir=(0.7071067812, 0, -0.7071067812), z_dir=(-0.7071067812, 0, -0.7071067812))):
        with BuildLine():
            ThreePointArc((0, -2.5), (2.5, 0), (0, 2.5))
            Line((0, 2.5), (0, -2.5))
        make_face()
    revolve(axis=Axis((-35.2, -27.55, 12.5), (0, -1, 0)), mode=Mode.SUBTRACT)


with BuildPart() as f1_10:
    add(f1_9.part)

    # F4_t89: cut F4_tool90
    add(f4_tool90.part, mode=Mode.SUBTRACT)


with BuildPart() as f4_tool96:
    # F4_s97 → F4_t98 (new body)
    with BuildSketch(Plane.XZ.offset(27.55)):
        with Locations((-36.475, -1.775)):
            Rectangle(F4_S97_W, F4_S97_H)
    extrude(amount=F4_T98_DEPTH)

    # F4_s99 → F4_t100 (revolve, cut)
    with BuildSketch(Plane(origin=(-35.2, -27.55, -0.5), x_dir=(0.7071067812, 0, 0.7071067812), z_dir=(0.7071067812, 0, -0.7071067812))):
        with BuildLine():
            ThreePointArc((0, -2.5), (2.5, 0), (0, 2.5))
            Line((0, 2.5), (0, -2.5))
        make_face()
    revolve(axis=Axis((-35.2, -27.55, -0.5), (0, -1, 0)), mode=Mode.SUBTRACT)


with BuildPart() as f1_11:
    add(f1_10.part)

    # F4_t95: cut F4_tool96
    add(f4_tool96.part, mode=Mode.SUBTRACT)


with BuildPart() as f4_tool103:
    # F4_s104 → F4_t105 (new body)
    with BuildSketch(Plane.XZ.offset(7.9)):
        with BuildLine():
            ThreePointArc((-37.7, -2.5), (-36.967766953, -0.732233047), (-35.2, 0))
            Line((-35.2, 0), (-37.7, 0))
            Line((-37.7, 0), (-37.7, -2.5))
        make_face()
    extrude(amount=F4_T105_DEPTH)

    split(bisect_by=Plane.XZ.offset(14.15), keep=Keep.BOTTOM)


with BuildPart() as f4_tool107:
    # F4_s108 → F4_t109 (new body)
    with BuildSketch(Plane.XY.offset(-6.25)):
        with BuildLine():
            ThreePointArc((-37.7, -11.65), (-36.967766953, -13.417766953), (-35.2, -14.15))
            Line((-35.2, -14.15), (-37.7, -14.15))
            Line((-37.7, -14.15), (-37.7, -11.65))
        make_face()
    extrude(amount=F4_T109_DEPTH)

    split(bisect_by=Plane.XY.offset(-3), keep=Keep.TOP)

    split(bisect_by=Plane.XY, keep=Keep.BOTTOM)


with BuildPart() as f4_tool103_1:
    add(f4_tool103.part)

    # F4_t112: intersect F4_tool107
    add(f4_tool107.part, mode=Mode.INTERSECT)


with BuildPart() as f1_12:
    add(f1_11.part)

    # F4_t101: cut F4_tool103
    add(f4_tool103_1.part, mode=Mode.SUBTRACT)


with BuildPart() as f4_tool115:
    # F4_s116 → F4_t117 (new body)
    with BuildSketch(Plane.XZ.offset(-23.6)):
        with BuildLine():
            ThreePointArc((-37.7, -2.5), (-36.967766953, -0.732233047), (-35.2, 0))
            Line((-35.2, 0), (-37.7, 0))
            Line((-37.7, 0), (-37.7, -2.5))
        make_face()
    extrude(amount=F4_T117_DEPTH)

    split(bisect_by=Plane.XZ.offset(-17.35), keep=Keep.BOTTOM)


with BuildPart() as f4_tool119:
    # F4_s120 → F4_t121 (new body)
    with BuildSketch(Plane.XY.offset(-6.25)):
        with BuildLine():
            ThreePointArc((-37.7, 19.85), (-36.967766953, 18.082233047), (-35.2, 17.35))
            Line((-35.2, 17.35), (-37.7, 17.35))
            Line((-37.7, 17.35), (-37.7, 19.85))
        make_face()
    extrude(amount=F4_T121_DEPTH)

    split(bisect_by=Plane.XY.offset(-3), keep=Keep.TOP)

    split(bisect_by=Plane.XY, keep=Keep.BOTTOM)


with BuildPart() as f4_tool115_1:
    add(f4_tool115.part)

    # F4_t124: intersect F4_tool119
    add(f4_tool119.part, mode=Mode.INTERSECT)


with BuildPart() as f1_13:
    add(f1_12.part)

    # F4_t113: cut F4_tool115
    add(f4_tool115_1.part, mode=Mode.SUBTRACT)


with BuildPart() as f4_tool127:
    # F4_s128 → F4_t129 (new body)
    with BuildSketch(Plane.XY.offset(-6.25)):
        with BuildLine():
            ThreePointArc((-37.7, 2.25), (-36.967766953, 4.017766953), (-35.2, 4.75))
            Line((-35.2, 4.75), (-37.7, 4.75))
            Line((-37.7, 4.75), (-37.7, 2.25))
        make_face()
    extrude(amount=F4_T129_DEPTH)

    split(bisect_by=Plane.XY.offset(-3), keep=Keep.TOP)

    split(bisect_by=Plane.XY, keep=Keep.BOTTOM)


with BuildPart() as f4_tool132:
    # F4_s133 → F4_t134 (new body)
    with BuildSketch(Plane.XZ.offset(-17.35)):
        with BuildLine():
            ThreePointArc((-37.7, -2.5), (-36.967766953, -0.732233047), (-35.2, 0))
            Line((-35.2, 0), (-37.7, 0))
            Line((-37.7, 0), (-37.7, -2.5))
        make_face()
    extrude(amount=F4_T134_DEPTH)

    split(bisect_by=Plane.XZ.offset(-4.75), keep=Keep.TOP)


with BuildPart() as f4_tool127_1:
    add(f4_tool127.part)

    # F4_t136: intersect F4_tool132
    add(f4_tool132.part, mode=Mode.INTERSECT)


with BuildPart() as f1_14:
    add(f1_13.part)

    # F4_t125: cut F4_tool127
    add(f4_tool127_1.part, mode=Mode.SUBTRACT)


with BuildPart() as f4_tool139:
    # F4_s140 → F4_t141 (new body)
    with BuildSketch(Plane.XY.offset(-6.25)):
        with BuildLine():
            ThreePointArc((-37.7, -26.15), (-36.967766953, -24.382233047), (-35.2, -23.65))
            Line((-35.2, -23.65), (-37.7, -23.65))
            Line((-37.7, -23.65), (-37.7, -26.15))
        make_face()
    extrude(amount=F4_T141_DEPTH)

    split(bisect_by=Plane.XY.offset(-3), keep=Keep.TOP)

    split(bisect_by=Plane.XY, keep=Keep.BOTTOM)


with BuildPart() as f4_tool144:
    # F4_s145 → F4_t146 (new body)
    with BuildSketch(Plane.XZ.offset(14.15)):
        with BuildLine():
            ThreePointArc((-37.7, -2.5), (-36.967766953, -0.732233047), (-35.2, 0))
            Line((-35.2, 0), (-37.7, 0))
            Line((-37.7, 0), (-37.7, -2.5))
        make_face()
    extrude(amount=F4_T146_DEPTH)

    split(bisect_by=Plane.XZ.offset(23.65), keep=Keep.TOP)


with BuildPart() as f4_tool139_1:
    add(f4_tool139.part)

    # F4_t148: intersect F4_tool144
    add(f4_tool144.part, mode=Mode.INTERSECT)


with BuildPart() as f1_15:
    add(f1_14.part)

    # F4_t137: cut F4_tool139
    add(f4_tool139_1.part, mode=Mode.SUBTRACT)

    # F5 (on face) → F6 (cut)
    with BuildSketch(Plane(origin=(0, 30.05, 0), x_dir=(-1, 0, 0), z_dir=(0, 1, 0))):
        with Locations((0, 6.0658543371)):
            Circle(F5_R)
    extrude(amount=-F6_DEPTH, mode=Mode.SUBTRACT)


solid = f1_15.part
